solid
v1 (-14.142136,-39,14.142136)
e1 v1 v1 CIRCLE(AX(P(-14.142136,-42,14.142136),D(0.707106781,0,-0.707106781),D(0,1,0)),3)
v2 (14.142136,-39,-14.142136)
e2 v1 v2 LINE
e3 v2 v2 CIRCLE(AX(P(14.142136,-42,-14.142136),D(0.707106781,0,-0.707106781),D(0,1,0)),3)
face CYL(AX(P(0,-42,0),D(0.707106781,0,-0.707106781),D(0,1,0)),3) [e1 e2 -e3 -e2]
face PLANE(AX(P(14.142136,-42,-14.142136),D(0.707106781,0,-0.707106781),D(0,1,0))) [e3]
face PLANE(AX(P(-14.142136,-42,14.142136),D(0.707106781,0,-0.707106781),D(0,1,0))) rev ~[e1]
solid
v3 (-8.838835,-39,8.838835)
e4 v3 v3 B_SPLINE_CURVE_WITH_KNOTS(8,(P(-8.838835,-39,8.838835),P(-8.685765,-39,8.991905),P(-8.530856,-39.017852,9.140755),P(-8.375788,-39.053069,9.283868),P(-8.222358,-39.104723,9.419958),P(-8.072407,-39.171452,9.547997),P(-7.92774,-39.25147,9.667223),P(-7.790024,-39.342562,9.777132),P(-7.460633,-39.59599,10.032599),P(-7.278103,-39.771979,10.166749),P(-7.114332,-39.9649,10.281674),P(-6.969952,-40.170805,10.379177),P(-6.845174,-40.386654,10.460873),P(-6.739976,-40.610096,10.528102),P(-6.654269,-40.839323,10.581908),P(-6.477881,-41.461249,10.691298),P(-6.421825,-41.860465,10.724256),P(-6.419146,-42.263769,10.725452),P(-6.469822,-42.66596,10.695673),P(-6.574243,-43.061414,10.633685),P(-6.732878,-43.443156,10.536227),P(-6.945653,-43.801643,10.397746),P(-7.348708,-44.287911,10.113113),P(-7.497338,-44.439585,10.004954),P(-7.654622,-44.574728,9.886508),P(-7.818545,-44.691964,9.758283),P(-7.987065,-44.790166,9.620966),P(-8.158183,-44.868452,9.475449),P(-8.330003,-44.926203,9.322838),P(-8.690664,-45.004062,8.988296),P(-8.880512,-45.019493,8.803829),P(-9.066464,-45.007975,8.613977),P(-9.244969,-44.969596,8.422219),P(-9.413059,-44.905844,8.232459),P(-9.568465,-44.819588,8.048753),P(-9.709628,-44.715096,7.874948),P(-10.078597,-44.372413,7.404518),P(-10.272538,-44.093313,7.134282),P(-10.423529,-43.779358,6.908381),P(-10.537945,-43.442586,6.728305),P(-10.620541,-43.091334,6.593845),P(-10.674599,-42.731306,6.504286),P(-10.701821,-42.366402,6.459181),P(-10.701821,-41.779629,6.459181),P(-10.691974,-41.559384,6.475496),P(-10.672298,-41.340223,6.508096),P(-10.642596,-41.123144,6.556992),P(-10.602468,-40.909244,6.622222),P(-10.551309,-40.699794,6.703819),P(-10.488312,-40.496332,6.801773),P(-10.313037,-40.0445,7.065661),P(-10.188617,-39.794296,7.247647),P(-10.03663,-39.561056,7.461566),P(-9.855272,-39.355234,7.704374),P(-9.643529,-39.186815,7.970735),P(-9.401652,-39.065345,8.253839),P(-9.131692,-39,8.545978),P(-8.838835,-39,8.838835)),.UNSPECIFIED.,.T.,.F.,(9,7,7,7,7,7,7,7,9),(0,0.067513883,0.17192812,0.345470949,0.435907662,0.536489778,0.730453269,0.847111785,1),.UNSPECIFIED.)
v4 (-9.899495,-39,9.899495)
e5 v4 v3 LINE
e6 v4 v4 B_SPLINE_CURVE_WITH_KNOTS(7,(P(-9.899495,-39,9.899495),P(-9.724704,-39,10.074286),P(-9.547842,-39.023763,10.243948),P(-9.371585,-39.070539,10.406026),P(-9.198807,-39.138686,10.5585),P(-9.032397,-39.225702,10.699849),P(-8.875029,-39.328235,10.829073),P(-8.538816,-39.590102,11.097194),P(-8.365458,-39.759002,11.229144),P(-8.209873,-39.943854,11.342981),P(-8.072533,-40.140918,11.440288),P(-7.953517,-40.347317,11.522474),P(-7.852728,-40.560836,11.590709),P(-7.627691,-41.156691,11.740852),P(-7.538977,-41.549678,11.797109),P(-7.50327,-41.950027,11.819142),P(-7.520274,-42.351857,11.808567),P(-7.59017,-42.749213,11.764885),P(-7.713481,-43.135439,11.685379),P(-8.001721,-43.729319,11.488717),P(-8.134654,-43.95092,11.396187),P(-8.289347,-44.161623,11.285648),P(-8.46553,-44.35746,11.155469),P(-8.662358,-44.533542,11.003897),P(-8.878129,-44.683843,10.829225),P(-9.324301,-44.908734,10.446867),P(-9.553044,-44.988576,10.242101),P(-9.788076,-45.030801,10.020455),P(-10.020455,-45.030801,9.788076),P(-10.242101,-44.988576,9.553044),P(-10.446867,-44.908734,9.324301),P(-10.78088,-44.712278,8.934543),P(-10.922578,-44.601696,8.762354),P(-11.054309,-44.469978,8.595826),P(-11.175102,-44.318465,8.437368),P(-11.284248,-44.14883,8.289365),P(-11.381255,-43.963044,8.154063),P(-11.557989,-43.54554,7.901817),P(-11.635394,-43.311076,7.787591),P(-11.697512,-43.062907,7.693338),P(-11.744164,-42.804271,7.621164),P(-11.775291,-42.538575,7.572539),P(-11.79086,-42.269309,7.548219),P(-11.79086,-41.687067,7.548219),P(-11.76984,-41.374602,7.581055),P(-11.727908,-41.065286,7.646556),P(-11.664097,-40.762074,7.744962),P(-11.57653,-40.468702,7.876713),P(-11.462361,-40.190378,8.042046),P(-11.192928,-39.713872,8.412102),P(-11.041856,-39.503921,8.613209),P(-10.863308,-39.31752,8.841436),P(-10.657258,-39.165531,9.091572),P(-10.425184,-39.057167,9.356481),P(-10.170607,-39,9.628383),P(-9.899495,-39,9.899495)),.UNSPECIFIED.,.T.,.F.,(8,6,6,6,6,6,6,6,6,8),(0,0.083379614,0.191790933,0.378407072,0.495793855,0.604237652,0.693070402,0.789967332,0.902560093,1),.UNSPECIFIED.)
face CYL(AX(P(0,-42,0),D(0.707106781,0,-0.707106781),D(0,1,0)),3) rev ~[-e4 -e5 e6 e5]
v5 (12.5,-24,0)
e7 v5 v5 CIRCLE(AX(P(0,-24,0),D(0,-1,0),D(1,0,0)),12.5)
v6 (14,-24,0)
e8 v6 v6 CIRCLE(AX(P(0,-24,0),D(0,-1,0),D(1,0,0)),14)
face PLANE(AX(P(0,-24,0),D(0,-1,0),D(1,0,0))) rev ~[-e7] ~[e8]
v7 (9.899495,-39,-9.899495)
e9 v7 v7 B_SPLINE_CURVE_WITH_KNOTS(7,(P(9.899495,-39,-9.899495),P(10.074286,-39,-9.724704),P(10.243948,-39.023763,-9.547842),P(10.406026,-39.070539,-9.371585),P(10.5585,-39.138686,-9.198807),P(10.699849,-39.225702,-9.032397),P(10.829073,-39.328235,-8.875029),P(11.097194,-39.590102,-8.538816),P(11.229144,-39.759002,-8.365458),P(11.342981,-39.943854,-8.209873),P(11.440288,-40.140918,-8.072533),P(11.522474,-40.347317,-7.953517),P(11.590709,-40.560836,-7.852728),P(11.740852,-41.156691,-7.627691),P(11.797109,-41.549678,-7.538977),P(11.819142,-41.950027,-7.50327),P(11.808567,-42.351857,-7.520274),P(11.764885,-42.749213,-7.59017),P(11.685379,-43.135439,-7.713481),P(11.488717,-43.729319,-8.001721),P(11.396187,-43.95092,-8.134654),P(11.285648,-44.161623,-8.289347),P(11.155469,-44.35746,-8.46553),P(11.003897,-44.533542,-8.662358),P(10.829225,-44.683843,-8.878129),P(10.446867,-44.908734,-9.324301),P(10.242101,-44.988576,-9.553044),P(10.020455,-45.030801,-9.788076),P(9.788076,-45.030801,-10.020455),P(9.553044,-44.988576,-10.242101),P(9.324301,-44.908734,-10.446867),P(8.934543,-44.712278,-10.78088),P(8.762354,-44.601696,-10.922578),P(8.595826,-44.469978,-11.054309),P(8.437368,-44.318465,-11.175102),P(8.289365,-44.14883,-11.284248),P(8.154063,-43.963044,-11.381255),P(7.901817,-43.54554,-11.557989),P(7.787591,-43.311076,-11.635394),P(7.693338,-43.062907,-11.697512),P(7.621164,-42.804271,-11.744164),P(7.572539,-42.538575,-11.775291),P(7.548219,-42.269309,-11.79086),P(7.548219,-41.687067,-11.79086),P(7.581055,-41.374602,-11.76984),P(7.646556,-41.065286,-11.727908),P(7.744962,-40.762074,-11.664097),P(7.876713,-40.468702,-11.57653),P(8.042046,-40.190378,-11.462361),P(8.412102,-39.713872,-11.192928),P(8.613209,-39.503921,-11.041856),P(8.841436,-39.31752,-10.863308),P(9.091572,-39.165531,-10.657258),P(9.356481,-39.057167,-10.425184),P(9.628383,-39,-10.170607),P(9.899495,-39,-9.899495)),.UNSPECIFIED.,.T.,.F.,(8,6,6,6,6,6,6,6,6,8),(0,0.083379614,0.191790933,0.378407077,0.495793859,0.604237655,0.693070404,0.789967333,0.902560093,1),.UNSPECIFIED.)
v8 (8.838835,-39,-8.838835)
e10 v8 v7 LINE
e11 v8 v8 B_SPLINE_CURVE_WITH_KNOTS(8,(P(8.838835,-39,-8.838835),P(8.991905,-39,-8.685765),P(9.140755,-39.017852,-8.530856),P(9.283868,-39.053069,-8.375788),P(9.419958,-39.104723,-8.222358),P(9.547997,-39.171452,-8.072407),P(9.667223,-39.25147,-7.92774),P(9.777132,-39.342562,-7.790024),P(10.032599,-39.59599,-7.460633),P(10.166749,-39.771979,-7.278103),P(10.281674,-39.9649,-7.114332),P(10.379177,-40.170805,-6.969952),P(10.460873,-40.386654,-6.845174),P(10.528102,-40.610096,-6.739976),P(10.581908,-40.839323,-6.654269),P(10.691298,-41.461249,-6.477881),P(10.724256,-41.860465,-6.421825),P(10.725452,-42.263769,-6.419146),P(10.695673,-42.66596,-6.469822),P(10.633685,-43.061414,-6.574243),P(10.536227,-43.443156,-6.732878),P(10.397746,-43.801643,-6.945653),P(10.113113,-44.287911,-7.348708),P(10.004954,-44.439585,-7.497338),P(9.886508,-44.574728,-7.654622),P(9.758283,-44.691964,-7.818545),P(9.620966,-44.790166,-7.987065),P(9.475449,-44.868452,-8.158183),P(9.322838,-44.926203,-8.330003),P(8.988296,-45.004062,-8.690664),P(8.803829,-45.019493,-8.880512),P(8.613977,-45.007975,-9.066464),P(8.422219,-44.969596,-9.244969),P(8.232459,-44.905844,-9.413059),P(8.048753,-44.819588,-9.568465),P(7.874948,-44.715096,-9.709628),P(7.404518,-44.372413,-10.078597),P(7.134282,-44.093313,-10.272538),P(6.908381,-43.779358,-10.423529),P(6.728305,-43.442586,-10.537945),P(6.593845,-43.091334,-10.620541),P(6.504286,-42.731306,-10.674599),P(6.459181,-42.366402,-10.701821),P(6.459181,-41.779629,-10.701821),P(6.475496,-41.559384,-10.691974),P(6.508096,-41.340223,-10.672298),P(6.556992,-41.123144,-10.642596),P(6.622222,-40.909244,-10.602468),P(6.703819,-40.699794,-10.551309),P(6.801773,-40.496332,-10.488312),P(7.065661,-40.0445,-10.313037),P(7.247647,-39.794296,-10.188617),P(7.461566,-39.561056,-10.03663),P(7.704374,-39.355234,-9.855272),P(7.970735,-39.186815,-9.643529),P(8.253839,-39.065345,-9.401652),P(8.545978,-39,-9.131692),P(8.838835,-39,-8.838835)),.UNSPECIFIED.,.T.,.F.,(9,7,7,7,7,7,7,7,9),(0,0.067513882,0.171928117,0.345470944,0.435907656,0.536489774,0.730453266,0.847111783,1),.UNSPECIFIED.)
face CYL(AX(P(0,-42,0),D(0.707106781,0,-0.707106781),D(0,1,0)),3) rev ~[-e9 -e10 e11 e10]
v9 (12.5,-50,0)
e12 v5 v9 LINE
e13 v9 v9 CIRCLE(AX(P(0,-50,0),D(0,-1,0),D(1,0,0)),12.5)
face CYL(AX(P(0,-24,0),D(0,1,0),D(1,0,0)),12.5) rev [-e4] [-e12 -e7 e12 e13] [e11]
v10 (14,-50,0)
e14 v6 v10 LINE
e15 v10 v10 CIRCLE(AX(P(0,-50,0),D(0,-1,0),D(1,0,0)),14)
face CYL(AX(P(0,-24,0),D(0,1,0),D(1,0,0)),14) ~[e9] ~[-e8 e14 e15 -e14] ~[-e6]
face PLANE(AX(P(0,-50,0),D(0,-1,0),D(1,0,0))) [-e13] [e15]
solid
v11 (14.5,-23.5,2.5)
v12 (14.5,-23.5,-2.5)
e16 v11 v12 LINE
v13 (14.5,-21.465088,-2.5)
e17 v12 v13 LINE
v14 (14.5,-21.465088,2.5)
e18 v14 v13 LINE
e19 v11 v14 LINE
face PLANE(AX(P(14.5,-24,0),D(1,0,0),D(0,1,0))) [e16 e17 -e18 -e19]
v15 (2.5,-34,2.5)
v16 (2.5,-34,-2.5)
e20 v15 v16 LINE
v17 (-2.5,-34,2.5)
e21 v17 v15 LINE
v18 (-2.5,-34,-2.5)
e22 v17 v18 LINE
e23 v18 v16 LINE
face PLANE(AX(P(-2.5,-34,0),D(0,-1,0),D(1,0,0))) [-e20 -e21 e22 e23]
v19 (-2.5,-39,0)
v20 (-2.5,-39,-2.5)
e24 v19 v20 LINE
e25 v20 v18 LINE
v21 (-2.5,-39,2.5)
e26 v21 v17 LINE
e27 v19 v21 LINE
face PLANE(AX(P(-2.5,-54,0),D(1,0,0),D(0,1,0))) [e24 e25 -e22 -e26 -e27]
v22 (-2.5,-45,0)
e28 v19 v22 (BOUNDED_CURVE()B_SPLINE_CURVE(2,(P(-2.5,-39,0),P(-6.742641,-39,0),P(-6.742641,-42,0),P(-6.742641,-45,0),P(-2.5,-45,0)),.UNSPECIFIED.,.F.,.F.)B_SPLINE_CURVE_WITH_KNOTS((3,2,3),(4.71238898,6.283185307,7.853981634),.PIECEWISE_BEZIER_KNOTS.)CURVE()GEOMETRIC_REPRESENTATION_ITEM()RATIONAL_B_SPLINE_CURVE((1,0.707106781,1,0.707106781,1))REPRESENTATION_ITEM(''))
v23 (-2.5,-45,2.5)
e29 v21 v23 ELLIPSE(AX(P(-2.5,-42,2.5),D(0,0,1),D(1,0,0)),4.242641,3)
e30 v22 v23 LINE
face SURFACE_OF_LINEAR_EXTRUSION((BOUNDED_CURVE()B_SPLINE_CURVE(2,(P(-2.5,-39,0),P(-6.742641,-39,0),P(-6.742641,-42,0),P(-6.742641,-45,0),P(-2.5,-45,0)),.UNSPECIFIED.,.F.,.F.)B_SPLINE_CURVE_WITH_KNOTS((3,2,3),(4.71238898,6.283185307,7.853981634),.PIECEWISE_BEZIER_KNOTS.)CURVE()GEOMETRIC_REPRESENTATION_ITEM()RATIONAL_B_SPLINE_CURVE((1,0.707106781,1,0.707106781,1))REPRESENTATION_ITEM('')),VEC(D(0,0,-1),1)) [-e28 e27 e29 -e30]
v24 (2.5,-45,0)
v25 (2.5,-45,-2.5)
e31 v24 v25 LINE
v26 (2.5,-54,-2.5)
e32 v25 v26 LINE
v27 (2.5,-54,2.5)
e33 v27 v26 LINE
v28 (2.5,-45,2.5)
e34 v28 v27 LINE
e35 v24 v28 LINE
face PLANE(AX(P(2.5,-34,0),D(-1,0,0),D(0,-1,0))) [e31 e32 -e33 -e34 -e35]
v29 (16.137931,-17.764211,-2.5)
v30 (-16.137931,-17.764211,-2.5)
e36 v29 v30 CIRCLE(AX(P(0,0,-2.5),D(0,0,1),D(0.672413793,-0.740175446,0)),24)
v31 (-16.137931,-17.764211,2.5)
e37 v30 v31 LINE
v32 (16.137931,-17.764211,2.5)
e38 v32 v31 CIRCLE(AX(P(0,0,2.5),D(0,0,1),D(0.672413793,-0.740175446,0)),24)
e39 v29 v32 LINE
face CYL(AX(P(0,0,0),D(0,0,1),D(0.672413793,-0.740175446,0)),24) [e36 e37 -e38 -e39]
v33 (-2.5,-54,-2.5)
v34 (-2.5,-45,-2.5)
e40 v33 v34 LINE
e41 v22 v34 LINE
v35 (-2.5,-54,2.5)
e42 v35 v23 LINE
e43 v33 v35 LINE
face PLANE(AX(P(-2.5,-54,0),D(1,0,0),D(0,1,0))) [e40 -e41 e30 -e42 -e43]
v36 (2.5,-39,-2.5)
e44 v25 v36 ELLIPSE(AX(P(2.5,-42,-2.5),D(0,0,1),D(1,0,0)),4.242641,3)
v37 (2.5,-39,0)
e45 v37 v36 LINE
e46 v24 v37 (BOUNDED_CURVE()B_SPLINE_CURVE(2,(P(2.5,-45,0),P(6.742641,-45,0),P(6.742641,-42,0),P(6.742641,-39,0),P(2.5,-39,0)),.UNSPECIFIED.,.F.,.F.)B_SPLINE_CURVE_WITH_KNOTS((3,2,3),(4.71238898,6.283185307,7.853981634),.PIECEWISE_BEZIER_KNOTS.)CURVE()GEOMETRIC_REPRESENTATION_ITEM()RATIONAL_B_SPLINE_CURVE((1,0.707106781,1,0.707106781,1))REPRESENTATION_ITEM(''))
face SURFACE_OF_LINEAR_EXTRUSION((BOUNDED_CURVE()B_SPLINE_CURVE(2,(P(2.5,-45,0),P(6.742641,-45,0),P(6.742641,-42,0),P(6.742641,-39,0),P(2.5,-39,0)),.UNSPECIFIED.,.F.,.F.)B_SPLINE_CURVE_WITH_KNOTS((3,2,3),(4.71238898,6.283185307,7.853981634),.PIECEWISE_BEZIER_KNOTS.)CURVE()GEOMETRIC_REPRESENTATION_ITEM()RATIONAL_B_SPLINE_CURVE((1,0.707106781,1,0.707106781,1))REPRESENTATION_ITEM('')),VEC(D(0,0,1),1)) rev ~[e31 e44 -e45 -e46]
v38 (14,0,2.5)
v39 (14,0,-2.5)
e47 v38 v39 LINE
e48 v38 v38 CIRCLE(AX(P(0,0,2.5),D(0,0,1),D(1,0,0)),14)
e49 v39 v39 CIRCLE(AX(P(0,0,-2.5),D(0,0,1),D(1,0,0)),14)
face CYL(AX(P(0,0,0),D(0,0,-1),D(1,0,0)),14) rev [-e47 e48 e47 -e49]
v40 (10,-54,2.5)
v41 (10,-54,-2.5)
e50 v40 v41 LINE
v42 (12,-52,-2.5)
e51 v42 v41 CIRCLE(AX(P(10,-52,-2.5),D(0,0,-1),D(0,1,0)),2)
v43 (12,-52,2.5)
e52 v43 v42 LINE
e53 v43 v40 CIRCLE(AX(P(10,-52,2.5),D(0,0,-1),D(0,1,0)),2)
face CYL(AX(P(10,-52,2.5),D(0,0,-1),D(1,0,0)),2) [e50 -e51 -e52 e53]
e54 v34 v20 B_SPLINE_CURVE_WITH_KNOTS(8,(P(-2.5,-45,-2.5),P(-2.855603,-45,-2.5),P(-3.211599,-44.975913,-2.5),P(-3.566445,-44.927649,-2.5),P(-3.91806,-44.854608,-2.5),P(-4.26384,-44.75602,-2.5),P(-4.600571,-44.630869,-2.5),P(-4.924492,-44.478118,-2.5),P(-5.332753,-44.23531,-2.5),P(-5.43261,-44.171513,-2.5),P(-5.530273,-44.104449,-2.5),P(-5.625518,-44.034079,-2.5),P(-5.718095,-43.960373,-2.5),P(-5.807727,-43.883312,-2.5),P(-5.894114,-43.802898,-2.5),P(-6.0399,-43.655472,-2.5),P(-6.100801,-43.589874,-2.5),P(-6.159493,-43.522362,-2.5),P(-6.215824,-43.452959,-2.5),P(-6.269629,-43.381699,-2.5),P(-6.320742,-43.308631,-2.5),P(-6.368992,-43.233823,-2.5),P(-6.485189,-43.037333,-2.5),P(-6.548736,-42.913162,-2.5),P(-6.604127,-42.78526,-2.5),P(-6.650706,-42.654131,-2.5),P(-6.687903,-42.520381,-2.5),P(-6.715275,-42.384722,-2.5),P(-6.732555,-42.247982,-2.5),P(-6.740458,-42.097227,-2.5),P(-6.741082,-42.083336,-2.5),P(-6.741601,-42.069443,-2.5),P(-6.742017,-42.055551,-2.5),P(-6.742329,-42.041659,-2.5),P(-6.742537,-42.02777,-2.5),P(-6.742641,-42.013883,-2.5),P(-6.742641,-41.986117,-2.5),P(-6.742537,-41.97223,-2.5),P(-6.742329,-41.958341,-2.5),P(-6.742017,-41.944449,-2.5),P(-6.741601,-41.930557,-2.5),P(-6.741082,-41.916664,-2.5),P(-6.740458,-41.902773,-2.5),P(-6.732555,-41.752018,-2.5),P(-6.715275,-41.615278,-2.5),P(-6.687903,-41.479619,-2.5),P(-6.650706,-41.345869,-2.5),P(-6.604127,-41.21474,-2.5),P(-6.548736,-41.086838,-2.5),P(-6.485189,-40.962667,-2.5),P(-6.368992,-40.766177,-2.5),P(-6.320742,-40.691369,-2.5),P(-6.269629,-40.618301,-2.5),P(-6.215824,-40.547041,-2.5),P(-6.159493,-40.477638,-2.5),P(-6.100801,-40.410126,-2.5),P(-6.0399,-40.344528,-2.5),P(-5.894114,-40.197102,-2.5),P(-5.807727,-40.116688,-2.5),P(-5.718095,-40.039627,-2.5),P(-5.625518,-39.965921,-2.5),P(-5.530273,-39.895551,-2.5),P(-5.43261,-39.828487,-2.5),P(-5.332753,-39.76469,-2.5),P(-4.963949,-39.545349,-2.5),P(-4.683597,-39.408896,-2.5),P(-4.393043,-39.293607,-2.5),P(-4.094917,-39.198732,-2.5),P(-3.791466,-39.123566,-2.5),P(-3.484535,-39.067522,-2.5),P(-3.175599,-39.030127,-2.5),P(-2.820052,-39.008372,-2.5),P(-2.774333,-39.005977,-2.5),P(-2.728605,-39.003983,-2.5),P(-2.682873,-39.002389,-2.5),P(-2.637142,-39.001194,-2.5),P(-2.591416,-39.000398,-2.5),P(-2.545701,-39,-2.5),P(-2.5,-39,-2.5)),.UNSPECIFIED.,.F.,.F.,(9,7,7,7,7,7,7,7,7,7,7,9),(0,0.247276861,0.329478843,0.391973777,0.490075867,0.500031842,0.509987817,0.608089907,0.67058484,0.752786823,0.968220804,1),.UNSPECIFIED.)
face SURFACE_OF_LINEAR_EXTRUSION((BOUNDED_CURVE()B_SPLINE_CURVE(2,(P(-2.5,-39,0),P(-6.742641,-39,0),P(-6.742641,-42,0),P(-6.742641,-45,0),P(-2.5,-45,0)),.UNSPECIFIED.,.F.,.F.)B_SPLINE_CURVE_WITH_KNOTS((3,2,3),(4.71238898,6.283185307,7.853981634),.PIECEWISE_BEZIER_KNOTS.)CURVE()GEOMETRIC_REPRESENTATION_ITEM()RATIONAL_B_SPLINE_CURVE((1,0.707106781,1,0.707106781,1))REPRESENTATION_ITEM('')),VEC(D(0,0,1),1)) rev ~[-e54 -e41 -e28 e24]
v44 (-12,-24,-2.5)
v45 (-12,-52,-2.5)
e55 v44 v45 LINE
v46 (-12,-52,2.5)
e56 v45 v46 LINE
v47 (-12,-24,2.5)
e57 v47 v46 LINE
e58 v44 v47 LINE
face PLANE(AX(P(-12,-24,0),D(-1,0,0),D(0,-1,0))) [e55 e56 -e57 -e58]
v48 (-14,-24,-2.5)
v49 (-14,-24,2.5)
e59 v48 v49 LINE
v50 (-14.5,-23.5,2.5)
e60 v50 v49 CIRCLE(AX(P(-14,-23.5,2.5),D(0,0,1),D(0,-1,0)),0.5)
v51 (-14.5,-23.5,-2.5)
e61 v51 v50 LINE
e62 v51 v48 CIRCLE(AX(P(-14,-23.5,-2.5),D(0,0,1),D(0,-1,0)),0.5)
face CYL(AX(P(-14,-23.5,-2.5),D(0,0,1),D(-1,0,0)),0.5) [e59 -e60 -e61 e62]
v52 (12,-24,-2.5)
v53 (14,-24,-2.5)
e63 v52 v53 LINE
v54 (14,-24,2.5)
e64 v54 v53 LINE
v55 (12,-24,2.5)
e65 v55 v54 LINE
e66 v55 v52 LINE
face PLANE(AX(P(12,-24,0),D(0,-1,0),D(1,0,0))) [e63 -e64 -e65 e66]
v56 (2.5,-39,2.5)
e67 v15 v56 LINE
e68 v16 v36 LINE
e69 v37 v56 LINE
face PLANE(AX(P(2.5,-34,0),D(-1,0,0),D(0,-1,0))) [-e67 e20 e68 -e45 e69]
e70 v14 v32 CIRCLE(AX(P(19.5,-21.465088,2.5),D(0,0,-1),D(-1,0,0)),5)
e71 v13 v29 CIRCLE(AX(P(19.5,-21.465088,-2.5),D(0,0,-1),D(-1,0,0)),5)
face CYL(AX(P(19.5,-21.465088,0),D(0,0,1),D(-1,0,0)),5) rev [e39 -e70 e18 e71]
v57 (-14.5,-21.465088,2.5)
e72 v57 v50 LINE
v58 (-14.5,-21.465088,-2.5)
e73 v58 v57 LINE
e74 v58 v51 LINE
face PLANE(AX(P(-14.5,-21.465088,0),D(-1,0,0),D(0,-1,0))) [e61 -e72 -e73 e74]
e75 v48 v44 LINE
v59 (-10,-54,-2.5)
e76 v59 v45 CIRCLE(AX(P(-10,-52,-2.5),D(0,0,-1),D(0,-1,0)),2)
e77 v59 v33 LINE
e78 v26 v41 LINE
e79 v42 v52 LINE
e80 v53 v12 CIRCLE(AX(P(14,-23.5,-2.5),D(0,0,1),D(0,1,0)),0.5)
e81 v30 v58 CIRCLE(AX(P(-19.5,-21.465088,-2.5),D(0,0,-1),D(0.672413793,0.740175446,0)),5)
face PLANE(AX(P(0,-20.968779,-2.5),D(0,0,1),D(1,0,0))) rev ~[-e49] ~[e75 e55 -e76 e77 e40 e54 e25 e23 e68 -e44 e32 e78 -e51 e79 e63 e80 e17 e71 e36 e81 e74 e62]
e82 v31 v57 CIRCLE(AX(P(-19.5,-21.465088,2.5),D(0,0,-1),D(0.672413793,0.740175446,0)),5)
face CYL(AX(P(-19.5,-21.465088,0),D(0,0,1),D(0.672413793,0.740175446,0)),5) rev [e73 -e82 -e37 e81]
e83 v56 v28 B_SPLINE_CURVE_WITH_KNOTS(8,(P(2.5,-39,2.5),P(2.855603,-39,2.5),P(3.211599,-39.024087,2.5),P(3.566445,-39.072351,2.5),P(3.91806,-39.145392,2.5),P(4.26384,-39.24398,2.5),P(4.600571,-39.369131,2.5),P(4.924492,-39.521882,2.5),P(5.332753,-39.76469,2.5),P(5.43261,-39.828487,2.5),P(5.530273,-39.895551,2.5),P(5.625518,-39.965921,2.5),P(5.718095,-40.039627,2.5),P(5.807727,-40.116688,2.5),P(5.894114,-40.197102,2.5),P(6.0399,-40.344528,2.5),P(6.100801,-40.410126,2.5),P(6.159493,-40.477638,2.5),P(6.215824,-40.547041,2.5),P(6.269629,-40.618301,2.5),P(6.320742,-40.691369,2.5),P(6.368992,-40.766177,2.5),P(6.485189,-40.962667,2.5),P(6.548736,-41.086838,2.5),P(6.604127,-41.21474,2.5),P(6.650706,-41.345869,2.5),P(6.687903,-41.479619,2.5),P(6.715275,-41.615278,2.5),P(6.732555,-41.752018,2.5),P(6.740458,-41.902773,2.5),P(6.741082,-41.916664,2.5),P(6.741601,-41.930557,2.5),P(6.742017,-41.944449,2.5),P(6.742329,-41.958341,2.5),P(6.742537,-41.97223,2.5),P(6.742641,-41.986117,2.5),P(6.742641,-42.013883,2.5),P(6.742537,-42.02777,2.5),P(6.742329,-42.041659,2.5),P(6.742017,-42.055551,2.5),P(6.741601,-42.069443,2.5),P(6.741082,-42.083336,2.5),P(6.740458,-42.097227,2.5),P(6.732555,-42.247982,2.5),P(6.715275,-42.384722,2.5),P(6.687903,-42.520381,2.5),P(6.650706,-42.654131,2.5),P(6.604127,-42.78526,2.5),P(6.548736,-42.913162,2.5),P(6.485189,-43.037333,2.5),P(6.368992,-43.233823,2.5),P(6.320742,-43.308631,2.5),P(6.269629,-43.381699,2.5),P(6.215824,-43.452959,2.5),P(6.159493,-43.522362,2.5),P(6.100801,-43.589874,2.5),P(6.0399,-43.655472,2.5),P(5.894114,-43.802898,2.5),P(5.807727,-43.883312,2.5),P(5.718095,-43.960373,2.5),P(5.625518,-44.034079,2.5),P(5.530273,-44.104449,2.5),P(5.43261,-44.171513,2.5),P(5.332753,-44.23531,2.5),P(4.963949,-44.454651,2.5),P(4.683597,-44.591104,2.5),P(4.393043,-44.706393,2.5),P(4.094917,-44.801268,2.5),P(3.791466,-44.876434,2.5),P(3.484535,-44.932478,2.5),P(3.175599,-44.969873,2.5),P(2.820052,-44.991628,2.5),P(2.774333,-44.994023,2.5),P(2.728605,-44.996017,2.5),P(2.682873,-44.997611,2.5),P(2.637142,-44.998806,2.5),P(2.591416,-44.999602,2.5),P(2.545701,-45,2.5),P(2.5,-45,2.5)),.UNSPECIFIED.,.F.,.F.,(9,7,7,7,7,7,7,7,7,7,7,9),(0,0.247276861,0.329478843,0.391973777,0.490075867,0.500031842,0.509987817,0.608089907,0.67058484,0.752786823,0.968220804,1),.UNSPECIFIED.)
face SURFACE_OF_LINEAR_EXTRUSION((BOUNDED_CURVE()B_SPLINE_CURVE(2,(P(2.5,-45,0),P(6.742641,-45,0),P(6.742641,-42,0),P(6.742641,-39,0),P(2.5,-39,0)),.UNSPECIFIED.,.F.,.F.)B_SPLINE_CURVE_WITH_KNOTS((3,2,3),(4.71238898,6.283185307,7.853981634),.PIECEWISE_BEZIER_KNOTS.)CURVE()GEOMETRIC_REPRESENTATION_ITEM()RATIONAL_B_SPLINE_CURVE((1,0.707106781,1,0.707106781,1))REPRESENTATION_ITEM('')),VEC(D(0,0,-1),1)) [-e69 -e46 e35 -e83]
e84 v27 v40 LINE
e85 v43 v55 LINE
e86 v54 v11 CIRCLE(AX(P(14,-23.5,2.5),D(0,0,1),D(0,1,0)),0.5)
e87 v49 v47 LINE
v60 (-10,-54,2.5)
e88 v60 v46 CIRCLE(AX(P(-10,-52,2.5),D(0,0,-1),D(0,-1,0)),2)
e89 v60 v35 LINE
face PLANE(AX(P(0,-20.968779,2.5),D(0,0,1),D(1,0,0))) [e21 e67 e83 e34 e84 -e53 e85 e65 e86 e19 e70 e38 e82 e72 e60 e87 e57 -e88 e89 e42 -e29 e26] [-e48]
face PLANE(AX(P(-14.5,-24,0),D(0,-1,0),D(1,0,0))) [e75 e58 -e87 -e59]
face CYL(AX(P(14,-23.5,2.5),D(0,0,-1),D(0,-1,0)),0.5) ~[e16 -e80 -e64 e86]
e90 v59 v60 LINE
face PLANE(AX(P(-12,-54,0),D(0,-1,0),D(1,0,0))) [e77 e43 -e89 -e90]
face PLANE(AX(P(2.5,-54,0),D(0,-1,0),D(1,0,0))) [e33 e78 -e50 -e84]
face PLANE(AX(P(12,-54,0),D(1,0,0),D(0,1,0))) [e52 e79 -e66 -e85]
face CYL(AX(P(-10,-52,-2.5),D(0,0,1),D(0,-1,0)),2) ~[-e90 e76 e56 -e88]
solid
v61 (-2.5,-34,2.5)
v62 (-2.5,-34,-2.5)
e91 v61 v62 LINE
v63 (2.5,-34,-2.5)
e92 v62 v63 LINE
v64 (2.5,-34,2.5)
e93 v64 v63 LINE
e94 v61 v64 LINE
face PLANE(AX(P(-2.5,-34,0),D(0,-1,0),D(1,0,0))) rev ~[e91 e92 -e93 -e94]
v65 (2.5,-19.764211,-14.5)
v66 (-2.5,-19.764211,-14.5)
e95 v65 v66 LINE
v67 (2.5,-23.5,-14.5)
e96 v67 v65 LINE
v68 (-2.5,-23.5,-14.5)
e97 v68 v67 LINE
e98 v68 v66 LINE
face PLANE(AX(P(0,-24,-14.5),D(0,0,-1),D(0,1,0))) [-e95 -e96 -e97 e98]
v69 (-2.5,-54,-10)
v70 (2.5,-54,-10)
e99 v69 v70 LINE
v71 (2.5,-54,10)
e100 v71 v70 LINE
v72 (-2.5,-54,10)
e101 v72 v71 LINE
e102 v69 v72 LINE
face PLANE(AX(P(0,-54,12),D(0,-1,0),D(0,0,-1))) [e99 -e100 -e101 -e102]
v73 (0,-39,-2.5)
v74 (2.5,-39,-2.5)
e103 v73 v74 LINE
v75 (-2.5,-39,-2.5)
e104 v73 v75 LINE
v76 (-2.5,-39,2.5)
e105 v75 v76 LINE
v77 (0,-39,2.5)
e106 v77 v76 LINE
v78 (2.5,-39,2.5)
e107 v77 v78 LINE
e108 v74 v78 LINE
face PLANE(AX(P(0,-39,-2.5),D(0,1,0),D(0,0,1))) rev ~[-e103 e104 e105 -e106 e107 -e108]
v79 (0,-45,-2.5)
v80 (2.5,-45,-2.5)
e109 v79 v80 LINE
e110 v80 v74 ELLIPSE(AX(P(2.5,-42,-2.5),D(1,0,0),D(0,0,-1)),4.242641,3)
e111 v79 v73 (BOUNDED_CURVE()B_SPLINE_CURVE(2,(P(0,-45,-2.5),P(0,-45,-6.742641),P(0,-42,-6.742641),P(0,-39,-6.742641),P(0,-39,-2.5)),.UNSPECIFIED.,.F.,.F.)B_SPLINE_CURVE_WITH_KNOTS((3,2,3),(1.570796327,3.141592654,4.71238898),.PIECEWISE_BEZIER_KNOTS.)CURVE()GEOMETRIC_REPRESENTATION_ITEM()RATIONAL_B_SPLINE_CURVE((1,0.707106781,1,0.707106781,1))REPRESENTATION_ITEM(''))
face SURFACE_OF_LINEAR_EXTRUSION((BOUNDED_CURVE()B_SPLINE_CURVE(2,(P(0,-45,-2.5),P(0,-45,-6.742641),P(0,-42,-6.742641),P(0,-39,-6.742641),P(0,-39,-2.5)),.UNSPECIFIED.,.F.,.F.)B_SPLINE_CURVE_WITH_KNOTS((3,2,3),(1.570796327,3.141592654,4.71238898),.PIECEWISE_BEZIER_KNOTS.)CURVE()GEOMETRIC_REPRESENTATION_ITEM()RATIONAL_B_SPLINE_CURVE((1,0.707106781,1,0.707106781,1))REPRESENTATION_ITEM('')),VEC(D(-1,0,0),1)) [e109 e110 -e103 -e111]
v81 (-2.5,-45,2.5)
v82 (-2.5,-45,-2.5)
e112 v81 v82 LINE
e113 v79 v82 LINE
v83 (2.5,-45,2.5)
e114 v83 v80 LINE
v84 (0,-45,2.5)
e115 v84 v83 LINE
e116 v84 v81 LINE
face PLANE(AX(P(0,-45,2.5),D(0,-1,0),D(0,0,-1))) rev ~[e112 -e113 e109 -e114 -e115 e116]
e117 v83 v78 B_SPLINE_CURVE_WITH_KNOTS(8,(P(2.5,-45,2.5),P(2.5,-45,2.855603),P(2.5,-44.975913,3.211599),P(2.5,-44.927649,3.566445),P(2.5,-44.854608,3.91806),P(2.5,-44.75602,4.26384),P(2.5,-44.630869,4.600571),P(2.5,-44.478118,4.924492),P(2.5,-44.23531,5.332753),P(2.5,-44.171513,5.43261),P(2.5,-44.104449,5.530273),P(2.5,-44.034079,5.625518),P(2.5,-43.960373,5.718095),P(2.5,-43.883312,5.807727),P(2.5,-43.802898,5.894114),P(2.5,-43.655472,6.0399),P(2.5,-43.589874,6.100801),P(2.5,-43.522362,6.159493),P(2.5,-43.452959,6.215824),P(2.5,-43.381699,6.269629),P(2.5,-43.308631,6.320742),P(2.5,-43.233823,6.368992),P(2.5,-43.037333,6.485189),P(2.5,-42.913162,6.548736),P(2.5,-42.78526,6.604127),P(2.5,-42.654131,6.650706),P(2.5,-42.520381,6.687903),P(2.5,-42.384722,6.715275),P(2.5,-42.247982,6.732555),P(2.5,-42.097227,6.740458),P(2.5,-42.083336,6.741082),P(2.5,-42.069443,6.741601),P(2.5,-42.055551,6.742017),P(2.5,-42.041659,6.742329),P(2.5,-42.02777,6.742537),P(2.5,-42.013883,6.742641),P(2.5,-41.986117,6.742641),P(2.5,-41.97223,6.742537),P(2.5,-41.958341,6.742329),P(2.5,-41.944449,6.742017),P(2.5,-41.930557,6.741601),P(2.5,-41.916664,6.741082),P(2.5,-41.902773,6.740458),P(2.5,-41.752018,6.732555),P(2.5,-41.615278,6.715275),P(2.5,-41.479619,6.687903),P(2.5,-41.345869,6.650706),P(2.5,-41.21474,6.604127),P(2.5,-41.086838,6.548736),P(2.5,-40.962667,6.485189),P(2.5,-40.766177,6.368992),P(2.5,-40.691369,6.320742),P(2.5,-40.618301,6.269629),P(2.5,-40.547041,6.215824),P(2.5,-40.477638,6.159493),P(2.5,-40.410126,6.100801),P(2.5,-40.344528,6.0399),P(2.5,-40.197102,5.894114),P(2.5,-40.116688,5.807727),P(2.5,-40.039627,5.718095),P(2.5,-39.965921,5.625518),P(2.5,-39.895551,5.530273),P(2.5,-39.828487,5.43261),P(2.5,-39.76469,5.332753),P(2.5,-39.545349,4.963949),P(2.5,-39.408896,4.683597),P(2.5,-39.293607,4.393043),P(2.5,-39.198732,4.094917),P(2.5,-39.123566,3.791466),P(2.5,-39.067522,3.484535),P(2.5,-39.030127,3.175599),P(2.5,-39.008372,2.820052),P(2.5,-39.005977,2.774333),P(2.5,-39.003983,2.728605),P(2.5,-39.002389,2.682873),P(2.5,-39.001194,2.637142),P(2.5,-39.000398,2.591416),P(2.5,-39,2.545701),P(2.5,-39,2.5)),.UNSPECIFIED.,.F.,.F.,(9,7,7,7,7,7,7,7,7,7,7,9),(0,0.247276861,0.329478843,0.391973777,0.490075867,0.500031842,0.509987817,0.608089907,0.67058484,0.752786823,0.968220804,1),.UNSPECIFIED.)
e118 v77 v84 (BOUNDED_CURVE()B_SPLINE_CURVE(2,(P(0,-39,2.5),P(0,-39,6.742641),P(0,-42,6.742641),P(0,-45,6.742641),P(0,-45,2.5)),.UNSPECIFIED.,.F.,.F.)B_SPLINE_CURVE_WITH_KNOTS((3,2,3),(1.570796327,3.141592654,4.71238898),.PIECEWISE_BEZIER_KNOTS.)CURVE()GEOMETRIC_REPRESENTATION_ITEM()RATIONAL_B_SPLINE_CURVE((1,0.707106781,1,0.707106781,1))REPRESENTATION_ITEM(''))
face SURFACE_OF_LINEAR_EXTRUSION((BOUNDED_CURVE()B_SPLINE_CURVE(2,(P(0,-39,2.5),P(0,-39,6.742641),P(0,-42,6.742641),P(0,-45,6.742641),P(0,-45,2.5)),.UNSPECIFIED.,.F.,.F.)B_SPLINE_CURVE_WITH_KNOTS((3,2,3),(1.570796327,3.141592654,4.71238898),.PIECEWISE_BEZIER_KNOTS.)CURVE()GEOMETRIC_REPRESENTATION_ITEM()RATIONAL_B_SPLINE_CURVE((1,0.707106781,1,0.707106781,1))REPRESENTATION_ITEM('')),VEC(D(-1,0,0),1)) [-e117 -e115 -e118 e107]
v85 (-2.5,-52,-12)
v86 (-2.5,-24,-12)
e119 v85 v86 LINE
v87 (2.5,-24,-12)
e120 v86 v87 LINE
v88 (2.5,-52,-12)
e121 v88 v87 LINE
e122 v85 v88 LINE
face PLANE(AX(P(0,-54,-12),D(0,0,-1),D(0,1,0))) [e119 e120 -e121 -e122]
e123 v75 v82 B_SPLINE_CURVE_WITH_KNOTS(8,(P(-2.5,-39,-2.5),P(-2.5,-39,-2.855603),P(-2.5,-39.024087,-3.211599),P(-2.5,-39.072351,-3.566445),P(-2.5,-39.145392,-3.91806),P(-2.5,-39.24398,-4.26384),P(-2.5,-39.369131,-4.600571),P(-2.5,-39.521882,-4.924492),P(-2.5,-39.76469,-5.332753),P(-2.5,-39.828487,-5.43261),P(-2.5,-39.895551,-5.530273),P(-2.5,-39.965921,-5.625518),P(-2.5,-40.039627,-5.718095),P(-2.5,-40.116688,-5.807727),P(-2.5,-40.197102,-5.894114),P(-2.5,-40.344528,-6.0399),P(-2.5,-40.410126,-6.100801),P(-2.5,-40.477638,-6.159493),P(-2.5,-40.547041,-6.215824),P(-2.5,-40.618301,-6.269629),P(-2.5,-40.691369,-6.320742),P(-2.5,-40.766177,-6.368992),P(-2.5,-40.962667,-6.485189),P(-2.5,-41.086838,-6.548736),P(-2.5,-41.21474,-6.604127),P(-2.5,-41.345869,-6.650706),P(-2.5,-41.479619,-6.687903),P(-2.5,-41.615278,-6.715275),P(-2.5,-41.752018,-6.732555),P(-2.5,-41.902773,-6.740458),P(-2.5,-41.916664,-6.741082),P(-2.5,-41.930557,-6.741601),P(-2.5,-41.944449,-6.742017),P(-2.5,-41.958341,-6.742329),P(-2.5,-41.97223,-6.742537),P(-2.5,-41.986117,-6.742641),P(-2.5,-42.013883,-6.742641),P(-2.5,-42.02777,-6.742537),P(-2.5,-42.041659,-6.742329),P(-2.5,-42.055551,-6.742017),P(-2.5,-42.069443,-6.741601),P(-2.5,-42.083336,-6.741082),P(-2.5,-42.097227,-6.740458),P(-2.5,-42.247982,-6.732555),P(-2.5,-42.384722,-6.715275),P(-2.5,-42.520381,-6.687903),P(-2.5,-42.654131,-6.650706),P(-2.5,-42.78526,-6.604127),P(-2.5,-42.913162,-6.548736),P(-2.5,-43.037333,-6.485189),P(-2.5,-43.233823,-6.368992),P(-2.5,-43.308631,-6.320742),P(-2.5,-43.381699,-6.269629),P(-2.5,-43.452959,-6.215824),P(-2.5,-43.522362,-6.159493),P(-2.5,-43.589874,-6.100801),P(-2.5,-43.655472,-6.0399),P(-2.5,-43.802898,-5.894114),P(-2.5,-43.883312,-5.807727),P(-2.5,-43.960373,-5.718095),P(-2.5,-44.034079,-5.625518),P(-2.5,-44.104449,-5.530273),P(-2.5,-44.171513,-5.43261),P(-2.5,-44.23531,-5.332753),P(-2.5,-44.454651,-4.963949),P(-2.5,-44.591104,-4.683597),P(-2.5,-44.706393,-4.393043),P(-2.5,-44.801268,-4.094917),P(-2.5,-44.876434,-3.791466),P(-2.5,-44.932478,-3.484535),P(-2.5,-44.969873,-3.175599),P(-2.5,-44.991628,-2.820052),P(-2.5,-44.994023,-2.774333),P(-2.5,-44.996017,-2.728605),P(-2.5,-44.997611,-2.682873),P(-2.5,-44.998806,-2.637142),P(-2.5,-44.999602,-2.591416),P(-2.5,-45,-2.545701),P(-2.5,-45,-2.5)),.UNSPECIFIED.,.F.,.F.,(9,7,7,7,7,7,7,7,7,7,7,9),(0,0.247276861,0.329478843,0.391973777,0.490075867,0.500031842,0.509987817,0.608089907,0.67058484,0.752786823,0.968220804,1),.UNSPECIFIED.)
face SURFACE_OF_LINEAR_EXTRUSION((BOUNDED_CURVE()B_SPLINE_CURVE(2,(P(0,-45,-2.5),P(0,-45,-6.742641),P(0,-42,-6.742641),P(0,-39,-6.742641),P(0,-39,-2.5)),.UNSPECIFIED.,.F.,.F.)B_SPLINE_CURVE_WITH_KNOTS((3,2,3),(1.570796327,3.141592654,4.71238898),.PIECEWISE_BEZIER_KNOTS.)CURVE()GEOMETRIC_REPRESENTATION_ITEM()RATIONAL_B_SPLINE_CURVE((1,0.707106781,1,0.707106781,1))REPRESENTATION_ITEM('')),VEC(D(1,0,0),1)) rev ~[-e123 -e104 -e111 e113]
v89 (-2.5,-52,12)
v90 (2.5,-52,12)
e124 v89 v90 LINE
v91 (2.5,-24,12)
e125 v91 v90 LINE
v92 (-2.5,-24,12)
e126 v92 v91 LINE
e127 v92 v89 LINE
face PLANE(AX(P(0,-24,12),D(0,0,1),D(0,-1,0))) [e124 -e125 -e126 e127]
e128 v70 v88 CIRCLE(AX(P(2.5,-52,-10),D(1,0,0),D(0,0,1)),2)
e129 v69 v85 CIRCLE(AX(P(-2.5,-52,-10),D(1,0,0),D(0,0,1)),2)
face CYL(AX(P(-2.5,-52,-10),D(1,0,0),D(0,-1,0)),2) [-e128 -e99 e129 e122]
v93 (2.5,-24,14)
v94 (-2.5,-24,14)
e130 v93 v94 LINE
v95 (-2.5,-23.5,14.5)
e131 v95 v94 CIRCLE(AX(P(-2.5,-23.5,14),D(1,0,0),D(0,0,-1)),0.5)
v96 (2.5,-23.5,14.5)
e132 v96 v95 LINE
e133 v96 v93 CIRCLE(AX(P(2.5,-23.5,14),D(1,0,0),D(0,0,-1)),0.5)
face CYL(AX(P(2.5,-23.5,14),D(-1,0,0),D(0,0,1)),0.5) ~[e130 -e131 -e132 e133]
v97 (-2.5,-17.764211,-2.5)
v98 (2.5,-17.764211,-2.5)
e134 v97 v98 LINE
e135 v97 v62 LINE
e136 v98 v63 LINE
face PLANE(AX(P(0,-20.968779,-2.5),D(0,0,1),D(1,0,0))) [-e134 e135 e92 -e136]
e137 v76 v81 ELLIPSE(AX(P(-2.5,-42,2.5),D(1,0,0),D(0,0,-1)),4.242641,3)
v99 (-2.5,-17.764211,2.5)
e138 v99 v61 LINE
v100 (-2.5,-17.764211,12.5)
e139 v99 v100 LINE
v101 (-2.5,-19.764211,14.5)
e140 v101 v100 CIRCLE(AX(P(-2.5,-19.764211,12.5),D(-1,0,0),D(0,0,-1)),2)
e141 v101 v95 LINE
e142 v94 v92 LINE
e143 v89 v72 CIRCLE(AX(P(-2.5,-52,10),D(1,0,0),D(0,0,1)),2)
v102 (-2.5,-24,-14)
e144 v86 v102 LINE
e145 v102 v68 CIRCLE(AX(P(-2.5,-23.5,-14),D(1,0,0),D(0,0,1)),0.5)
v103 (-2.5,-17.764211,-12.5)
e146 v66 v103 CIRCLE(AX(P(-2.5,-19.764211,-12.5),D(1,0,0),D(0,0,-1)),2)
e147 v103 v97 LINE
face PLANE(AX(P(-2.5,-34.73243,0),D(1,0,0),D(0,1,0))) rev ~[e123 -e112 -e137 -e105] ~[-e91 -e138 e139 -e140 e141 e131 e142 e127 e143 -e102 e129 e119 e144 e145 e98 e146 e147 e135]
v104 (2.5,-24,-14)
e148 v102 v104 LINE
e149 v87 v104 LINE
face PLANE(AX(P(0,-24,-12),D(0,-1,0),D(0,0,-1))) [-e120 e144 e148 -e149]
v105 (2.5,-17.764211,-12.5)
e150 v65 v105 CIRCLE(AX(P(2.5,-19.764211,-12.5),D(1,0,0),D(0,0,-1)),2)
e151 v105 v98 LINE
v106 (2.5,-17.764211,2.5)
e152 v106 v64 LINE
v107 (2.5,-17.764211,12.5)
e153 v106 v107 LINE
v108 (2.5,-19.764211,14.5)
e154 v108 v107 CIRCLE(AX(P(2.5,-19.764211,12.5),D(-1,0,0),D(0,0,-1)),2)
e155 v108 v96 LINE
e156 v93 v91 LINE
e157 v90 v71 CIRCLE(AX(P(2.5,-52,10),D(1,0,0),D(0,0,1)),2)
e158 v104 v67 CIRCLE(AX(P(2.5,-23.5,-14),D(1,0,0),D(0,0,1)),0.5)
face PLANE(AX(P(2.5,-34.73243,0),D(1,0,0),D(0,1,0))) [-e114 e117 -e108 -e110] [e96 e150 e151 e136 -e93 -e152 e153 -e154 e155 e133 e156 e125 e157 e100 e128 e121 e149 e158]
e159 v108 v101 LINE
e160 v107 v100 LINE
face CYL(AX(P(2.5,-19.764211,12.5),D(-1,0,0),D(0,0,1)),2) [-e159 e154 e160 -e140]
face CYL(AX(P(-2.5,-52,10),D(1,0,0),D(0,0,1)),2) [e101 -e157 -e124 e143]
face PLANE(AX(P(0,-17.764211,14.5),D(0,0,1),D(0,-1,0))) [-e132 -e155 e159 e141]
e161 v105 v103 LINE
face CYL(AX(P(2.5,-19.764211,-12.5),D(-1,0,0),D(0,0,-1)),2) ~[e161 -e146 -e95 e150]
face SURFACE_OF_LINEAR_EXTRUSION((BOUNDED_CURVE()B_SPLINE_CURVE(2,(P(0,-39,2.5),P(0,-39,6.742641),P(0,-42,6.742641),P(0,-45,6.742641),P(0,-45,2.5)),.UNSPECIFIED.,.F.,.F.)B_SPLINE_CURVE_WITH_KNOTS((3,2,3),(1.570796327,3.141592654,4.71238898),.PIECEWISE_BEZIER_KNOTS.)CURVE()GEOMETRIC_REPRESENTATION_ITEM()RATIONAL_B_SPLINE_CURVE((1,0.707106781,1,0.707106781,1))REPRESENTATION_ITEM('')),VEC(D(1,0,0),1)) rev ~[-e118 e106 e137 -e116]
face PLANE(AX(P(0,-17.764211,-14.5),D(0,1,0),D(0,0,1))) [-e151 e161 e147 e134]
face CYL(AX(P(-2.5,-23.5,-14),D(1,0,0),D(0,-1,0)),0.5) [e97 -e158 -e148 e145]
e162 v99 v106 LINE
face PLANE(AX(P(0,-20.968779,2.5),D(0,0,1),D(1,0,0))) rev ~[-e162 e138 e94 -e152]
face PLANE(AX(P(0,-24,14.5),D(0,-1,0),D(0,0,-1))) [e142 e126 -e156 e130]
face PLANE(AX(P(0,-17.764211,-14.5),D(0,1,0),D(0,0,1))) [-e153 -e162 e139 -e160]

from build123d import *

# Parameters (mm, degrees)
F0_R      = 14
F1_DEPTH  = 2.5
F3_DEPTH  = 2.5
F6_START  = 24
F5_R      = 14
F5_R_2    = 12.5
F6_DEPTH  = 26
F8_R      = 3
F9_DEPTH  = 20
F13_DEPTH = 12.5
F16_DEPTH = 12.5
F17_R     = 2
F17_2_R   = 2
F18_R     = 2
F19_R     = 0.5
F19_2_R   = 0.5


with BuildPart() as f1:
    # F0 (on Top) → F1 (new body, symmetric)
    with BuildSketch(Plane.XY):
        with BuildLine():
            ThreePointArc((14.5, -21.4650879337), (14.9277825496, -19.4415199002), (16.1379310345, -17.7642107037))
            ThreePointArc((16.1379310345, -17.7642107037), (0, 24), (-16.1379310345, -17.7642107037))
            ThreePointArc((-16.1379310345, -17.7642107037), (-14.9277825496, -19.4415199002), (-14.5, -21.4650879337))
            Line((-14.5, -21.4650879337), (-14.5, -24))
            Line((-14.5, -24), (-12, -24))
            Line((-12, -24), (-12, -54))
            Line((-12, -54), (-2.5, -54))
            Line((-2.5, -54), (-2.5, -34))
            Line((-2.5, -34), (2.5, -34))
            Line((2.5, -34), (2.5, -54))
            Line((2.5, -54), (12, -54))
            Line((12, -54), (12, -24))
            Line((12, -24), (14.5, -24))
            Line((14.5, -24), (14.5, -21.4650879337))
        make_face()
        Circle(F0_R, mode=Mode.SUBTRACT)
    extrude(amount=F1_DEPTH, both=True)


with BuildPart() as f3:
    # F2 (on Right) → F3 (new body, symmetric)
    with BuildSketch(Plane.YZ):
        Polygon((-24, 14.5), (-24, 12), (-54, 12), (-54, -12), (-24, -12), (-24, -14.5), (-17.7642107037, -14.5), (-17.7642107037, 14.5), align=None)
    extrude(amount=F3_DEPTH, both=True)

    # F4: cut F1
    add(f1.part, mode=Mode.SUBTRACT)


with BuildPart() as f6:
    # F5 (on Front) → F6 (new body)
    with BuildSketch(Plane.XZ.offset(F6_START)):
        Circle(F5_R)
        Circle(F5_R_2, mode=Mode.SUBTRACT)
    extrude(amount=F6_DEPTH)


with BuildPart() as f9:
    # F8 (on face) → F9 (new body, symmetric)
    with BuildSketch(Plane(origin=(0, 0, 0), x_dir=(0, 1, 0), z_dir=(0.7071067812, 0, -0.7071067812))):
        with Locations((-42, 0)):
            Circle(F8_R)
    extrude(amount=F9_DEPTH, both=True)


with BuildPart() as f6_1:
    add(f6.part)

    # F10: cut F9
    add(f9.part, mode=Mode.SUBTRACT)


with BuildPart() as f3_1:
    add(f3.part)

    # F11: cut F9
    add(f9.part, mode=Mode.SUBTRACT)

    # F15 (on Right) → F16 (cut, symmetric)
    with BuildSketch(Plane.YZ):
        with BuildLine():
            Line((-45, 2.5), (-45, -2.5))
            add(Edge.make_bspline(
                [(-45, -2.5), (-45, -6.7426406871), (-42, -6.7426406871), (-39, -6.7426406871), (-39, -2.5)],
                knots=[1.5707963268, 1.5707963268, 1.5707963268, 3.1415926536, 3.1415926536, 4.7123889804, 4.7123889804, 4.7123889804], degree=2, weights=[1, 0.7071067812, 1, 0.7071067812, 1]))
            Line((-39, -2.5), (-39, 2.5))
            add(Edge.make_bspline(
                [(-39, 2.5), (-39, 6.7426406871), (-42, 6.7426406871), (-45, 6.7426406871), (-45, 2.5)],
                knots=[1.5707963268, 1.5707963268, 1.5707963268, 3.1415926536, 3.1415926536, 4.7123889804, 4.7123889804, 4.7123889804], degree=2, weights=[1, 0.7071067812, 1, 0.7071067812, 1]))
        make_face()
    extrude(amount=F16_DEPTH, both=True, mode=Mode.SUBTRACT)

    # F17#2
    f17_2_edges = [f3_1.edges().sort_by_distance(p)[0] for p in [
        (0, -54, 12),
        (0, -54, -12),
    ]]
    fillet(f17_2_edges, radius=F17_2_R)

    # F18
    f18_edges = [f3_1.edges().sort_by_distance(p)[0] for p in [
        (0, -17.764211, -14.5),
        (0, -17.764211, 14.5),
    ]]
    fillet(f18_edges, radius=F18_R)

    # F19#2
    f19_2_edges = [f3_1.edges().sort_by_distance(p)[0] for p in [
        (0, -24, 14.5),
        (0, -24, -14.5),
    ]]
    fillet(f19_2_edges, radius=F19_2_R)


with BuildPart() as f1_1:
    add(f1.part)

    # F11: cut F9
    add(f9.part, mode=Mode.SUBTRACT)


with BuildPart() as f13:
    # F12 (on Top) → F13 (new body, symmetric)
    with BuildSketch(Plane.XY):
        with BuildLine():
            Line((2.5, -39), (-2.5, -39))
            add(Edge.make_bspline(
                [(-2.5, -39), (-6.7426406871, -39), (-6.7426406871, -42), (-6.7426406871, -45), (-2.5, -45)],
                knots=[4.7123889804, 4.7123889804, 4.7123889804, 6.2831853072, 6.2831853072, 7.853981634, 7.853981634, 7.853981634], degree=2, weights=[1, 0.7071067812, 1, 0.7071067812, 1]))
            Line((-2.5, -45), (2.5, -45))
            add(Edge.make_bspline(
                [(2.5, -45), (6.7426406871, -45), (6.7426406871, -42), (6.7426406871, -39), (2.5, -39)],
                knots=[4.7123889804, 4.7123889804, 4.7123889804, 6.2831853072, 6.2831853072, 7.853981634, 7.853981634, 7.853981634], degree=2, weights=[1, 0.7071067812, 1, 0.7071067812, 1]))
        make_face()
    extrude(amount=F13_DEPTH, both=True)


with BuildPart() as f1_2:
    add(f1_1.part)

    # F14: cut F13
    add(f13.part, mode=Mode.SUBTRACT)

    # F17
    f17_edges = [f1_2.edges().sort_by_distance(p)[0] for p in [
        (12, -54, 0),
        (-12, -54, 0),
    ]]
    fillet(f17_edges, radius=F17_R)

    # F19
    f19_edges = [f1_2.edges().sort_by_distance(p)[0] for p in [
        (14.5, -24, 0),
        (-14.5, -24, 0),
    ]]
    fillet(f19_edges, radius=F19_R)


solid = Compound([f9.part, f6_1.part, f3_1.part, f1_2.part])
